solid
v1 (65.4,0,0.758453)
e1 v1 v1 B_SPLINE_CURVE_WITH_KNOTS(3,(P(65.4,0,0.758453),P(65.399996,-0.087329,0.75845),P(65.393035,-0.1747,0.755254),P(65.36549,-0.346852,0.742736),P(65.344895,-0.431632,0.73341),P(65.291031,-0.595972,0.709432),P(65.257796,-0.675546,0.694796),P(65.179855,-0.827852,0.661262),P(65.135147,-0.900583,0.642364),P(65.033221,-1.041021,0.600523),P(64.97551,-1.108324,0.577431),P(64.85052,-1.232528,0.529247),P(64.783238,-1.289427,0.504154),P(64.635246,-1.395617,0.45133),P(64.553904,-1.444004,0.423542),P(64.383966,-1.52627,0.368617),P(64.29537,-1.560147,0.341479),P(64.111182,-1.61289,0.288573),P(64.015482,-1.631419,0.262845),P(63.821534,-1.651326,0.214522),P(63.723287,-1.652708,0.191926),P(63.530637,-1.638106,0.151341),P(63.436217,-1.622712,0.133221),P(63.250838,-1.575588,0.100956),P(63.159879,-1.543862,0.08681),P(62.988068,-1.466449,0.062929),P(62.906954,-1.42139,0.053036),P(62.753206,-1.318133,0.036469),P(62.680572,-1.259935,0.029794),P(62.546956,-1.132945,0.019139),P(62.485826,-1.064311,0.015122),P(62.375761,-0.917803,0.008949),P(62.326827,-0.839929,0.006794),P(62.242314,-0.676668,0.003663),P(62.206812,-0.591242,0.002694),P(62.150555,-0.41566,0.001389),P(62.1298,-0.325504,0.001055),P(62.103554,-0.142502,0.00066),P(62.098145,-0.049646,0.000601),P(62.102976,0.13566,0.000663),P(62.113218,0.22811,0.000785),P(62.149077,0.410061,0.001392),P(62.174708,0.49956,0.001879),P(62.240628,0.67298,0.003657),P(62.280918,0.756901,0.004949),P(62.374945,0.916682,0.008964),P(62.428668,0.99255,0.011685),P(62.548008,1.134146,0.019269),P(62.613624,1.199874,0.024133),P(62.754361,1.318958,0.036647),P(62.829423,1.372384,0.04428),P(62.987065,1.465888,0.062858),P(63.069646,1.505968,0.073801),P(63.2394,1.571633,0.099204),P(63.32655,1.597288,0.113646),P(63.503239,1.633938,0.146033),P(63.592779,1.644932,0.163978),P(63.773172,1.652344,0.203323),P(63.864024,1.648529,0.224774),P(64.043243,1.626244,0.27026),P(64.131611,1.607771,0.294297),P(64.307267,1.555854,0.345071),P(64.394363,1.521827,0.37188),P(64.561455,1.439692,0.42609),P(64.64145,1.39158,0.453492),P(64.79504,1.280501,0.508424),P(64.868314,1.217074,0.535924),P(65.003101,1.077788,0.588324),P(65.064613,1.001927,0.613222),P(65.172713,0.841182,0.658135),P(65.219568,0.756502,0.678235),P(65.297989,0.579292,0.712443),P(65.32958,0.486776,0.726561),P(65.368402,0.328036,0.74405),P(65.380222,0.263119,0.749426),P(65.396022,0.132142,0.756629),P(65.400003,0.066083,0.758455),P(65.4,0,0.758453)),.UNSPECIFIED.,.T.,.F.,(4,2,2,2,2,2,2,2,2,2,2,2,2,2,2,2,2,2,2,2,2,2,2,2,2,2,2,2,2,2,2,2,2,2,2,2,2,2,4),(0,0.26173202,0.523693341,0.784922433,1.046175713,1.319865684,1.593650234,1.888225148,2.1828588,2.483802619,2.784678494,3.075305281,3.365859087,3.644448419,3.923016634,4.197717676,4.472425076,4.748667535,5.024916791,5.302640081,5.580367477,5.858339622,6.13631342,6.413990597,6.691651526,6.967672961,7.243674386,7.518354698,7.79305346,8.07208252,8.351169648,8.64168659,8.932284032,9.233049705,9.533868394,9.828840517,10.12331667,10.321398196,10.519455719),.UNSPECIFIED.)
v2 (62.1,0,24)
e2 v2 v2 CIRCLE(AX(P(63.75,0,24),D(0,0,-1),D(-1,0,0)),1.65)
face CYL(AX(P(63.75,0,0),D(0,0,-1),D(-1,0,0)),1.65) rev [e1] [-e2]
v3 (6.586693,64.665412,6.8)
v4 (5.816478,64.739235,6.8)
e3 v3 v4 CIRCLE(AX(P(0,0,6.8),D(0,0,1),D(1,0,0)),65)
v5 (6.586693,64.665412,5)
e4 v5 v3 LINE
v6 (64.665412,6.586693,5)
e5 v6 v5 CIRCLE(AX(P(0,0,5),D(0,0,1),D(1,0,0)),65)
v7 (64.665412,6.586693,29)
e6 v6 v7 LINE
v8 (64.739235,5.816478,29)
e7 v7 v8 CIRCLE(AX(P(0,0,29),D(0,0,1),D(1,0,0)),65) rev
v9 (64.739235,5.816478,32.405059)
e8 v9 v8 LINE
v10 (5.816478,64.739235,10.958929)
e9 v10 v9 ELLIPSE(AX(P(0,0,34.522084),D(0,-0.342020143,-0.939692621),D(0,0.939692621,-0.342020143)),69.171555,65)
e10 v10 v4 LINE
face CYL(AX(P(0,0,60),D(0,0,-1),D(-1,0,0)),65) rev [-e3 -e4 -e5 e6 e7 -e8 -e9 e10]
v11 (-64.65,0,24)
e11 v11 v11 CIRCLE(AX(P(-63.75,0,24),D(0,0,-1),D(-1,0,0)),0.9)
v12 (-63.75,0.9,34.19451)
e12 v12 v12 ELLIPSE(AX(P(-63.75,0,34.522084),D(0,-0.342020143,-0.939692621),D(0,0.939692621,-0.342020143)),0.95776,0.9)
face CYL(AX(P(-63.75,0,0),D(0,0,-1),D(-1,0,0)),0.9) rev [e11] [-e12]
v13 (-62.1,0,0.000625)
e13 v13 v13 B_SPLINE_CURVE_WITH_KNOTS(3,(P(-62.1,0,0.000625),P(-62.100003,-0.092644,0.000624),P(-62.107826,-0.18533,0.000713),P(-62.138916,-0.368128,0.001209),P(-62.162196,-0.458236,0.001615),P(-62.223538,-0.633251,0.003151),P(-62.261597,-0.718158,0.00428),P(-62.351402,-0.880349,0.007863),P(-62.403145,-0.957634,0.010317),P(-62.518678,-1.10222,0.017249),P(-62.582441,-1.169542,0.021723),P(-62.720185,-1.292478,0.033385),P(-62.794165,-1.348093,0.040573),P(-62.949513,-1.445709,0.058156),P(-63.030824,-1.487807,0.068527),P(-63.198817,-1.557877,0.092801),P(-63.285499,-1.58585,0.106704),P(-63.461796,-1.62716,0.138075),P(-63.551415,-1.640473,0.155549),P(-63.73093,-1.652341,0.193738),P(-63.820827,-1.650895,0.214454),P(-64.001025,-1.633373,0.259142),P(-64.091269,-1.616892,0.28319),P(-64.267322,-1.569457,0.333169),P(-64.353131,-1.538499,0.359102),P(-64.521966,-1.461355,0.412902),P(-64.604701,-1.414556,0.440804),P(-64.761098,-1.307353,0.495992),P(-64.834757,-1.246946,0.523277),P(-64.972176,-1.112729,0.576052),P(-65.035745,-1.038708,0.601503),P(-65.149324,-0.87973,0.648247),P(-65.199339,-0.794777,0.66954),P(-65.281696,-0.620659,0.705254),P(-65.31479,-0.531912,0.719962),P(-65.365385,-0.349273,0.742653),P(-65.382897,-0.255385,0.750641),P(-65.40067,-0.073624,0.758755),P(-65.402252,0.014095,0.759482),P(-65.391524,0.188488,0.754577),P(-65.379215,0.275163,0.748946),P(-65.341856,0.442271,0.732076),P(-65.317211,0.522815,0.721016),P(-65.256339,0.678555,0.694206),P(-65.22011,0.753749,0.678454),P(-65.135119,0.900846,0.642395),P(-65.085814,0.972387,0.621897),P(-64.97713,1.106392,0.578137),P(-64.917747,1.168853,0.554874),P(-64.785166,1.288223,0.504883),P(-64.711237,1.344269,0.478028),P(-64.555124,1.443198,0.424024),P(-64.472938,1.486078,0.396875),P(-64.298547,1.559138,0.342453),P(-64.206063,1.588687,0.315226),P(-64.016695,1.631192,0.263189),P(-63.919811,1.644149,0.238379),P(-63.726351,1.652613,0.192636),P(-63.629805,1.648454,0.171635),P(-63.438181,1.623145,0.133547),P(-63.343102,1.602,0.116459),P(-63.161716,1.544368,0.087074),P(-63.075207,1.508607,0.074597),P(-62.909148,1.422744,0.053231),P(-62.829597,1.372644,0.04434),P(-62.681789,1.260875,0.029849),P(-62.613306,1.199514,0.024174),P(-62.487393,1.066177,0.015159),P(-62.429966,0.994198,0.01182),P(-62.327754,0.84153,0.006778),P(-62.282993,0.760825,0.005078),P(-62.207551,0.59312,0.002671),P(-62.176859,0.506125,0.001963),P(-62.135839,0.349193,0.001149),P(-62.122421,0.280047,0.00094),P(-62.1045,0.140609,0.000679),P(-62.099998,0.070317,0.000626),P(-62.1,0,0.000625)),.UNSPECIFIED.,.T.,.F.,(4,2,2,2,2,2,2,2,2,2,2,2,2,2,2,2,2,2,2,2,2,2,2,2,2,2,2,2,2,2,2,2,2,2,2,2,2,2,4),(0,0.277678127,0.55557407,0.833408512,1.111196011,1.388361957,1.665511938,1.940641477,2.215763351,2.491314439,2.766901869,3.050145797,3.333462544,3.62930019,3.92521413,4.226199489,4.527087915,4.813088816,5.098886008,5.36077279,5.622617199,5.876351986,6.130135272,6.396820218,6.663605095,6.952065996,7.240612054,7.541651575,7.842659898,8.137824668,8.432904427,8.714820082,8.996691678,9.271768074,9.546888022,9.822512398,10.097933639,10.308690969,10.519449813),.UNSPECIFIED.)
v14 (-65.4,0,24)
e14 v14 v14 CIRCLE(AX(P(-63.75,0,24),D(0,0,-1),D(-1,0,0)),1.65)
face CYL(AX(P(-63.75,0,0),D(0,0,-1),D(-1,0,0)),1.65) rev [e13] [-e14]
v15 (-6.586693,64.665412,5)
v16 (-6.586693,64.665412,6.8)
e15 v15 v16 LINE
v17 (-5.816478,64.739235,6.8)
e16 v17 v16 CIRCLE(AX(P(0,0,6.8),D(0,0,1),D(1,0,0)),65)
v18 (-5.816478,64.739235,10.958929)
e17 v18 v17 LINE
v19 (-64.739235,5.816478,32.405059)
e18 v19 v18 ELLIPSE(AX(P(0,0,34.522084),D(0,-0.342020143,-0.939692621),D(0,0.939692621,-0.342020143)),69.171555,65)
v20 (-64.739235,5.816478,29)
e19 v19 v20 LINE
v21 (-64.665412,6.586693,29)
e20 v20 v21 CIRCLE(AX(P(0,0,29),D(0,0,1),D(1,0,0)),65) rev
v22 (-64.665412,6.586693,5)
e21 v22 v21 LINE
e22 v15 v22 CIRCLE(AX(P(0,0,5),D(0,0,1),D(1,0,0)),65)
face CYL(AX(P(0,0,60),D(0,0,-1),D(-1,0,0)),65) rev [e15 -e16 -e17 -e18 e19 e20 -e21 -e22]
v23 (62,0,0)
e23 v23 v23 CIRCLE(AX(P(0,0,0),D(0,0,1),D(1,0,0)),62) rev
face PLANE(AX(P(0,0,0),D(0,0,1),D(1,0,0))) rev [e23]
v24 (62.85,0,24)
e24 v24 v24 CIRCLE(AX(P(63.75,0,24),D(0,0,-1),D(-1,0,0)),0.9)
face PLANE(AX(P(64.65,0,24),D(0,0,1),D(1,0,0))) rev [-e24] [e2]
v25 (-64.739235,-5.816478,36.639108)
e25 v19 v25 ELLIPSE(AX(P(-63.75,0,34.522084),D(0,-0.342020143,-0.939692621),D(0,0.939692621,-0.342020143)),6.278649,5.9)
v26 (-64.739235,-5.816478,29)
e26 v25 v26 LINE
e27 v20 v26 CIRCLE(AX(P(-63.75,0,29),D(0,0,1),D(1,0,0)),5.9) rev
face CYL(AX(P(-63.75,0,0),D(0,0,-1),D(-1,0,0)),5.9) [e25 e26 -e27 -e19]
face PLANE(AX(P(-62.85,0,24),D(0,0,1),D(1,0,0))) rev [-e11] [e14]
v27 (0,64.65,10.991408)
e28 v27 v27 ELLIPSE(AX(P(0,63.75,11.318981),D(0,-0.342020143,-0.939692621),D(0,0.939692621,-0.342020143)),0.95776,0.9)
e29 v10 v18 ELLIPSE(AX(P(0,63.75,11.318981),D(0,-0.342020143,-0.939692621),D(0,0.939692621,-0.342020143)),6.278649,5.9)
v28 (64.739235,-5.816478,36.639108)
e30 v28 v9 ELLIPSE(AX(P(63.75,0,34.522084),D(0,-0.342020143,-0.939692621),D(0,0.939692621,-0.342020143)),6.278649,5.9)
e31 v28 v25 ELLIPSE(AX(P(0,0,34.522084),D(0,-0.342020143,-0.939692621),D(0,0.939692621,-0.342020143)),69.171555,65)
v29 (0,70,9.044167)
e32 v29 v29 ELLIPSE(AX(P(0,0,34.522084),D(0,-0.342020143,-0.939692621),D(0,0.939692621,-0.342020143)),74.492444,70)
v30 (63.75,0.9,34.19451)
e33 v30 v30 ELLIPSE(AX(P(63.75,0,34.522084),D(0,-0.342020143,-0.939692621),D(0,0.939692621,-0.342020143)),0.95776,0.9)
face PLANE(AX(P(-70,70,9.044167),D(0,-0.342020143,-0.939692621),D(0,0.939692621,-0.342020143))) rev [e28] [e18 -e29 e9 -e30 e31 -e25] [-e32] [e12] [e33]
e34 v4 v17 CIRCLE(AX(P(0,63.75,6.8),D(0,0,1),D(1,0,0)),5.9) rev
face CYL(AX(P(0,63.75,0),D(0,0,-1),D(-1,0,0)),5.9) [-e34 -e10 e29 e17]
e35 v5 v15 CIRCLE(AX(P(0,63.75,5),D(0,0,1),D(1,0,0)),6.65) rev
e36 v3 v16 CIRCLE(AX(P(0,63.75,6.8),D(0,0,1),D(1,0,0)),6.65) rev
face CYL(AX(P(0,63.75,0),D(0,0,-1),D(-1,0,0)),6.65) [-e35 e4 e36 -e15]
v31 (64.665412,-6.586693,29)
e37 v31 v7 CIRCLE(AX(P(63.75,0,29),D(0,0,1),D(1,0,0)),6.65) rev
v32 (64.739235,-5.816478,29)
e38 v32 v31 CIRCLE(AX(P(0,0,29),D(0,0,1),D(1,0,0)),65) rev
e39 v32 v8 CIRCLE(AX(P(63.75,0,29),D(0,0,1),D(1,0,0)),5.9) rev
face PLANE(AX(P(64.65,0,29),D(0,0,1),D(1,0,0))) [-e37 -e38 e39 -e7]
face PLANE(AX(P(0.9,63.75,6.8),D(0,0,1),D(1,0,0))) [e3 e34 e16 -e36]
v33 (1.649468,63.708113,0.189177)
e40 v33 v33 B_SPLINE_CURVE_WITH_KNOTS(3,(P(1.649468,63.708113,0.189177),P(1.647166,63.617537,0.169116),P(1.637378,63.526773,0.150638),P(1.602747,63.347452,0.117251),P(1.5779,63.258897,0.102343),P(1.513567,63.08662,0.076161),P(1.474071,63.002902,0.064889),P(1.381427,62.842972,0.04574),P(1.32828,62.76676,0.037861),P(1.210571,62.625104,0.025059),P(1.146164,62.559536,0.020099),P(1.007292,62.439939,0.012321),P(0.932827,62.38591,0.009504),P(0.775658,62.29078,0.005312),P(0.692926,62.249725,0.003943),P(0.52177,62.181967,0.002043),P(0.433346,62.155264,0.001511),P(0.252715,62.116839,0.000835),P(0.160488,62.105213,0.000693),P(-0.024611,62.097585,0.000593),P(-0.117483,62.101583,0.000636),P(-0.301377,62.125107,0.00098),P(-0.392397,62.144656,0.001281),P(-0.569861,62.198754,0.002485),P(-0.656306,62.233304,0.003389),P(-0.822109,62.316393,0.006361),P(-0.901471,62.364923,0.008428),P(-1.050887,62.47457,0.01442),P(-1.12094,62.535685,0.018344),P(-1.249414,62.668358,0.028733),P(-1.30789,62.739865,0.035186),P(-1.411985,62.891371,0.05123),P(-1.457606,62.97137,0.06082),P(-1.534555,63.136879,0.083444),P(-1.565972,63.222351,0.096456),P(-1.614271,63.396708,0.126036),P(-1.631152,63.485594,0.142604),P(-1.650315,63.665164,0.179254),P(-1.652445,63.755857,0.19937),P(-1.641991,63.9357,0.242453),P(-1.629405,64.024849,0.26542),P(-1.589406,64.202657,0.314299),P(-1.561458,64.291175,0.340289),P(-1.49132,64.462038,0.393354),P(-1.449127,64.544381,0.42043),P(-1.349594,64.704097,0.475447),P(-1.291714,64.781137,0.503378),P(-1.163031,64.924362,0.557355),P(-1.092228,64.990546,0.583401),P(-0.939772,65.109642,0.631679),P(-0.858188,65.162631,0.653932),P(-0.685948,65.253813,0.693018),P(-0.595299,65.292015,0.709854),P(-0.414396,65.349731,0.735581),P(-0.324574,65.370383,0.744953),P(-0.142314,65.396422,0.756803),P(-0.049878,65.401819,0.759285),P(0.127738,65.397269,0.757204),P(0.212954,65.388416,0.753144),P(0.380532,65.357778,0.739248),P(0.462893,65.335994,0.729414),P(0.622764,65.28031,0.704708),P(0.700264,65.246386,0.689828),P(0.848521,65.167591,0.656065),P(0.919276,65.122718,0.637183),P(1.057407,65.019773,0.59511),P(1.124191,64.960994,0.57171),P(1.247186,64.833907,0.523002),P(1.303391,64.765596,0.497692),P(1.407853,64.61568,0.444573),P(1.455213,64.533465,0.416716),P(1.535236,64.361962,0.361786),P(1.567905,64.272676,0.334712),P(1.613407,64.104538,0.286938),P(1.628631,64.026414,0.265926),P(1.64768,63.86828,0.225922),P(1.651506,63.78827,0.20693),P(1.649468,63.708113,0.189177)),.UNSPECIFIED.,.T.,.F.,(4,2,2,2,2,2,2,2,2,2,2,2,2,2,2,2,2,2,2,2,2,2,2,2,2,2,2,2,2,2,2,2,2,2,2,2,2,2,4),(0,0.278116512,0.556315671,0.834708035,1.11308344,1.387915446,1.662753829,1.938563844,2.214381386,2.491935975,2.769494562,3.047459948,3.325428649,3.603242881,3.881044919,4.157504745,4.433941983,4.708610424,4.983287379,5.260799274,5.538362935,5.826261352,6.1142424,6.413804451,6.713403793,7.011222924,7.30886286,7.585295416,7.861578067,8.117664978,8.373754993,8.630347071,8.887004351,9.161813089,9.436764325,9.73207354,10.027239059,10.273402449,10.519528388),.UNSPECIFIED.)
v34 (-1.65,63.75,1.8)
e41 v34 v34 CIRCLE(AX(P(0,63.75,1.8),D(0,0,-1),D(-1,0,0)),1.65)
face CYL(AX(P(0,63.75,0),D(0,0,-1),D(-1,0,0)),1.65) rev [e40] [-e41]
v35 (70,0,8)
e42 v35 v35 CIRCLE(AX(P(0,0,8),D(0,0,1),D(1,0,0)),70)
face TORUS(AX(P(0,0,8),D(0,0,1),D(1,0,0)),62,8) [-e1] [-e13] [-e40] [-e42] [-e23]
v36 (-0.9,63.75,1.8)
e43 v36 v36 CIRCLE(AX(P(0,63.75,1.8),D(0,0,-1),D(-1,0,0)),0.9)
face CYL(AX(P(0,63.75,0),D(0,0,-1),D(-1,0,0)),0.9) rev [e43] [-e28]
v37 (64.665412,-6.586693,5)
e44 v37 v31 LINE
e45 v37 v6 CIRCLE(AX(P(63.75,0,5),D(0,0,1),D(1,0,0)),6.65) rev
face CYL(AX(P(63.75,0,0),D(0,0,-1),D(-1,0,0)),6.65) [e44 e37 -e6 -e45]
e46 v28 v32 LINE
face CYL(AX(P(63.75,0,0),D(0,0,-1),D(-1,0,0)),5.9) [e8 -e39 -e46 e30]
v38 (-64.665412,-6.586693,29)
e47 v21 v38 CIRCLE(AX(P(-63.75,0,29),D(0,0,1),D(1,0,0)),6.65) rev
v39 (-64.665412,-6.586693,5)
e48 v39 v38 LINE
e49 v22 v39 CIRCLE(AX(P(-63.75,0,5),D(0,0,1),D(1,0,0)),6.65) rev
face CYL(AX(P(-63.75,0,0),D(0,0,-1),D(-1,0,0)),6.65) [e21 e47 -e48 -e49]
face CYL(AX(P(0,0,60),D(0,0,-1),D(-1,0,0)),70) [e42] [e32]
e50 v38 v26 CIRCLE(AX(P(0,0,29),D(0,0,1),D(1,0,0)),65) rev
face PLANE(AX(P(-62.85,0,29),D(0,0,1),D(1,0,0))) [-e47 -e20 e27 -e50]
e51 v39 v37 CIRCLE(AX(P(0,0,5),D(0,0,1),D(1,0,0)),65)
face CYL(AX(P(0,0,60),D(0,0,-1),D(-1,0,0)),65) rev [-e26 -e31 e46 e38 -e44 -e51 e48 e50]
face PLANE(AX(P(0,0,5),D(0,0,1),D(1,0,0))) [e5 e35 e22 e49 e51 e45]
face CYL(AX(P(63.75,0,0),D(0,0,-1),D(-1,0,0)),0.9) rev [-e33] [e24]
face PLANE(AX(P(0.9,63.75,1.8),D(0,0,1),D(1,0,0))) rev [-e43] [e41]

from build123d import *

# Parameters (mm, degrees)
SKETCH_1_R                = 70
EXTRUDE_1_DEPTH           = 60
CUT_EXTRUDE_1_DEPTH       = 116.758369028
CUT_EXTRUDE_1_DEPTH_BACK  = 116.758369028
HOLE_WIZARD_1_D           = 1.8
HOLE_WIZARD_1_CBORE_D     = 3.3
HOLE_WIZARD_1_CBORE_DEPTH = 1.8
HOLE_WIZARD_2_D           = 1.8
HOLE_WIZARD_2_CBORE_D     = 3.3
HOLE_WIZARD_2_CBORE_DEPTH = 24
SHELL_START               = 5
SHELL_1_DEPTH             = 53.180148829
SHELL_START_2             = 29
SHELL_1_2_DEPTH           = 29.180148829
SHELL_START_3             = 6.8
SHELL_1_3_DEPTH           = 22.2
FILLET_2_R                = 8


# Read off the part's stored shape, not the designer's step: 抽壳1
with BuildPart() as part:
    # 草图1 → 凸台-拉伸1 (new body)
    with BuildSketch(Plane.XY):
        Circle(SKETCH_1_R)
    extrude(amount=EXTRUDE_1_DEPTH)

    # 草图2 → 切除-拉伸1 (cut, two sides: drawn at the far end of the back side and taken through both)
    with BuildSketch(Plane(origin=(0, 0, 0), x_dir=(0, 0, -1), z_dir=(1, 0, 0)).offset(-CUT_EXTRUDE_1_DEPTH_BACK)):
        Polygon((-60, -70), (-60, 70), (-9.044167203, 70), align=None)
    extrude(amount=CUT_EXTRUDE_1_DEPTH + CUT_EXTRUDE_1_DEPTH_BACK, mode=Mode.SUBTRACT)

    # 打孔尺寸(%根据)内六角圆柱头螺钉的类型1 (through all)
    with Locations(Plane(origin=(0, 0, 0), x_dir=(-1, 0, 0), z_dir=(0, 0, -1))):
        with Locations((0, 63.75)):
            CounterBoreHole(HOLE_WIZARD_1_D / 2, HOLE_WIZARD_1_CBORE_D / 2, HOLE_WIZARD_1_CBORE_DEPTH)

    # 打孔尺寸(%根据)内六角圆柱头螺钉的类型2 (through all)
    with Locations(Plane(origin=(0, 0, 0), x_dir=(-1, 0, 0), z_dir=(0, 0, -1))):
        with Locations((-63.75, 0), (63.75, 0)):
            CounterBoreHole(HOLE_WIZARD_2_D / 2, HOLE_WIZARD_2_CBORE_D / 2, HOLE_WIZARD_2_CBORE_DEPTH)

    # 抽壳1 outline → 抽壳1 (cut)
    with BuildSketch(Plane.XY.offset(SHELL_START)):
        with BuildLine():
            ThreePointArc((-64.665411765, -6.586692744), (0, -65), (64.665411765, -6.586692744))
            ThreePointArc((64.665411765, -6.586692744), (57.1, 0), (64.665411765, 6.586692744))
            ThreePointArc((64.665411765, 6.586692744), (45.961940777, 45.961940777), (6.586692744, 64.665411765))
            ThreePointArc((6.586692744, 64.665411765), (0, 57.1), (-6.586692744, 64.665411765))
            ThreePointArc((-6.586692744, 64.665411765), (-45.961940777, 45.961940777), (-64.665411765, 6.586692744))
            ThreePointArc((-64.665411765, 6.586692744), (-57.1, 0), (-64.665411765, -6.586692744))
        make_face()
    extrude(amount=SHELL_1_DEPTH, mode=Mode.SUBTRACT)

    # Shell 1 2 outline → Shell 1 2 (cut)
    with BuildSketch(Plane.XY.offset(SHELL_START_2)):
        with BuildLine():
            ThreePointArc((64.665411765, -6.586692744), (64.703469597, -6.2016951), (64.739235294, -5.81647776))
            ThreePointArc((64.739235294, -5.81647776), (57.85, 0), (64.739235294, 5.81647776))
            ThreePointArc((64.739235294, 5.81647776), (64.703469597, 6.2016951), (64.665411765, 6.586692744))
            ThreePointArc((64.665411765, 6.586692744), (57.1, 0), (64.665411765, -6.586692744))
        make_face()
        with BuildLine():
            ThreePointArc((-64.739235294, -5.81647776), (-64.703469597, -6.2016951), (-64.665411765, -6.586692744))
            ThreePointArc((-64.665411765, -6.586692744), (-57.1, 0), (-64.665411765, 6.586692744))
            ThreePointArc((-64.665411765, 6.586692744), (-64.703469597, 6.2016951), (-64.739235294, 5.81647776))
            ThreePointArc((-64.739235294, 5.81647776), (-57.85, 0), (-64.739235294, -5.81647776))
        make_face()
    extrude(amount=SHELL_1_2_DEPTH, mode=Mode.SUBTRACT)

    # Shell 1 3 outline → Shell 1 3 (cut)
    with BuildSketch(Plane.XY.offset(SHELL_START_3)):
        with BuildLine():
            ThreePointArc((-6.586692744, 64.665411765), (0, 57.1), (6.586692744, 64.665411765))
            ThreePointArc((6.586692744, 64.665411765), (6.2016951, 64.703469597), (5.81647776, 64.739235294))
            ThreePointArc((5.81647776, 64.739235294), (0, 57.85), (-5.81647776, 64.739235294))
            ThreePointArc((-5.81647776, 64.739235294), (-6.2016951, 64.703469597), (-6.586692744, 64.665411765))
        make_face()
    extrude(amount=SHELL_1_3_DEPTH, mode=Mode.SUBTRACT)

    # 圆角2
    # the kernel refuses this fillet: 8 mm, written as the material it takes off along each edge
    with BuildSketch(Plane(origin=(0, 0, 0), x_dir=(1, 0, 0), z_dir=(0, -1, 0))) as fillet_2_piece_1:
        with BuildLine():
            CenterArc((70 - FILLET_2_R, FILLET_2_R), FILLET_2_R, 270, 90)
            Line((70 - FILLET_2_R, 0), (70, 0))
            Line((70, 0), (70, FILLET_2_R))
        make_face()
    revolve(axis=Axis((0, 0, 0), (0, 0, 1)), mode=Mode.SUBTRACT)


solid = part.part
